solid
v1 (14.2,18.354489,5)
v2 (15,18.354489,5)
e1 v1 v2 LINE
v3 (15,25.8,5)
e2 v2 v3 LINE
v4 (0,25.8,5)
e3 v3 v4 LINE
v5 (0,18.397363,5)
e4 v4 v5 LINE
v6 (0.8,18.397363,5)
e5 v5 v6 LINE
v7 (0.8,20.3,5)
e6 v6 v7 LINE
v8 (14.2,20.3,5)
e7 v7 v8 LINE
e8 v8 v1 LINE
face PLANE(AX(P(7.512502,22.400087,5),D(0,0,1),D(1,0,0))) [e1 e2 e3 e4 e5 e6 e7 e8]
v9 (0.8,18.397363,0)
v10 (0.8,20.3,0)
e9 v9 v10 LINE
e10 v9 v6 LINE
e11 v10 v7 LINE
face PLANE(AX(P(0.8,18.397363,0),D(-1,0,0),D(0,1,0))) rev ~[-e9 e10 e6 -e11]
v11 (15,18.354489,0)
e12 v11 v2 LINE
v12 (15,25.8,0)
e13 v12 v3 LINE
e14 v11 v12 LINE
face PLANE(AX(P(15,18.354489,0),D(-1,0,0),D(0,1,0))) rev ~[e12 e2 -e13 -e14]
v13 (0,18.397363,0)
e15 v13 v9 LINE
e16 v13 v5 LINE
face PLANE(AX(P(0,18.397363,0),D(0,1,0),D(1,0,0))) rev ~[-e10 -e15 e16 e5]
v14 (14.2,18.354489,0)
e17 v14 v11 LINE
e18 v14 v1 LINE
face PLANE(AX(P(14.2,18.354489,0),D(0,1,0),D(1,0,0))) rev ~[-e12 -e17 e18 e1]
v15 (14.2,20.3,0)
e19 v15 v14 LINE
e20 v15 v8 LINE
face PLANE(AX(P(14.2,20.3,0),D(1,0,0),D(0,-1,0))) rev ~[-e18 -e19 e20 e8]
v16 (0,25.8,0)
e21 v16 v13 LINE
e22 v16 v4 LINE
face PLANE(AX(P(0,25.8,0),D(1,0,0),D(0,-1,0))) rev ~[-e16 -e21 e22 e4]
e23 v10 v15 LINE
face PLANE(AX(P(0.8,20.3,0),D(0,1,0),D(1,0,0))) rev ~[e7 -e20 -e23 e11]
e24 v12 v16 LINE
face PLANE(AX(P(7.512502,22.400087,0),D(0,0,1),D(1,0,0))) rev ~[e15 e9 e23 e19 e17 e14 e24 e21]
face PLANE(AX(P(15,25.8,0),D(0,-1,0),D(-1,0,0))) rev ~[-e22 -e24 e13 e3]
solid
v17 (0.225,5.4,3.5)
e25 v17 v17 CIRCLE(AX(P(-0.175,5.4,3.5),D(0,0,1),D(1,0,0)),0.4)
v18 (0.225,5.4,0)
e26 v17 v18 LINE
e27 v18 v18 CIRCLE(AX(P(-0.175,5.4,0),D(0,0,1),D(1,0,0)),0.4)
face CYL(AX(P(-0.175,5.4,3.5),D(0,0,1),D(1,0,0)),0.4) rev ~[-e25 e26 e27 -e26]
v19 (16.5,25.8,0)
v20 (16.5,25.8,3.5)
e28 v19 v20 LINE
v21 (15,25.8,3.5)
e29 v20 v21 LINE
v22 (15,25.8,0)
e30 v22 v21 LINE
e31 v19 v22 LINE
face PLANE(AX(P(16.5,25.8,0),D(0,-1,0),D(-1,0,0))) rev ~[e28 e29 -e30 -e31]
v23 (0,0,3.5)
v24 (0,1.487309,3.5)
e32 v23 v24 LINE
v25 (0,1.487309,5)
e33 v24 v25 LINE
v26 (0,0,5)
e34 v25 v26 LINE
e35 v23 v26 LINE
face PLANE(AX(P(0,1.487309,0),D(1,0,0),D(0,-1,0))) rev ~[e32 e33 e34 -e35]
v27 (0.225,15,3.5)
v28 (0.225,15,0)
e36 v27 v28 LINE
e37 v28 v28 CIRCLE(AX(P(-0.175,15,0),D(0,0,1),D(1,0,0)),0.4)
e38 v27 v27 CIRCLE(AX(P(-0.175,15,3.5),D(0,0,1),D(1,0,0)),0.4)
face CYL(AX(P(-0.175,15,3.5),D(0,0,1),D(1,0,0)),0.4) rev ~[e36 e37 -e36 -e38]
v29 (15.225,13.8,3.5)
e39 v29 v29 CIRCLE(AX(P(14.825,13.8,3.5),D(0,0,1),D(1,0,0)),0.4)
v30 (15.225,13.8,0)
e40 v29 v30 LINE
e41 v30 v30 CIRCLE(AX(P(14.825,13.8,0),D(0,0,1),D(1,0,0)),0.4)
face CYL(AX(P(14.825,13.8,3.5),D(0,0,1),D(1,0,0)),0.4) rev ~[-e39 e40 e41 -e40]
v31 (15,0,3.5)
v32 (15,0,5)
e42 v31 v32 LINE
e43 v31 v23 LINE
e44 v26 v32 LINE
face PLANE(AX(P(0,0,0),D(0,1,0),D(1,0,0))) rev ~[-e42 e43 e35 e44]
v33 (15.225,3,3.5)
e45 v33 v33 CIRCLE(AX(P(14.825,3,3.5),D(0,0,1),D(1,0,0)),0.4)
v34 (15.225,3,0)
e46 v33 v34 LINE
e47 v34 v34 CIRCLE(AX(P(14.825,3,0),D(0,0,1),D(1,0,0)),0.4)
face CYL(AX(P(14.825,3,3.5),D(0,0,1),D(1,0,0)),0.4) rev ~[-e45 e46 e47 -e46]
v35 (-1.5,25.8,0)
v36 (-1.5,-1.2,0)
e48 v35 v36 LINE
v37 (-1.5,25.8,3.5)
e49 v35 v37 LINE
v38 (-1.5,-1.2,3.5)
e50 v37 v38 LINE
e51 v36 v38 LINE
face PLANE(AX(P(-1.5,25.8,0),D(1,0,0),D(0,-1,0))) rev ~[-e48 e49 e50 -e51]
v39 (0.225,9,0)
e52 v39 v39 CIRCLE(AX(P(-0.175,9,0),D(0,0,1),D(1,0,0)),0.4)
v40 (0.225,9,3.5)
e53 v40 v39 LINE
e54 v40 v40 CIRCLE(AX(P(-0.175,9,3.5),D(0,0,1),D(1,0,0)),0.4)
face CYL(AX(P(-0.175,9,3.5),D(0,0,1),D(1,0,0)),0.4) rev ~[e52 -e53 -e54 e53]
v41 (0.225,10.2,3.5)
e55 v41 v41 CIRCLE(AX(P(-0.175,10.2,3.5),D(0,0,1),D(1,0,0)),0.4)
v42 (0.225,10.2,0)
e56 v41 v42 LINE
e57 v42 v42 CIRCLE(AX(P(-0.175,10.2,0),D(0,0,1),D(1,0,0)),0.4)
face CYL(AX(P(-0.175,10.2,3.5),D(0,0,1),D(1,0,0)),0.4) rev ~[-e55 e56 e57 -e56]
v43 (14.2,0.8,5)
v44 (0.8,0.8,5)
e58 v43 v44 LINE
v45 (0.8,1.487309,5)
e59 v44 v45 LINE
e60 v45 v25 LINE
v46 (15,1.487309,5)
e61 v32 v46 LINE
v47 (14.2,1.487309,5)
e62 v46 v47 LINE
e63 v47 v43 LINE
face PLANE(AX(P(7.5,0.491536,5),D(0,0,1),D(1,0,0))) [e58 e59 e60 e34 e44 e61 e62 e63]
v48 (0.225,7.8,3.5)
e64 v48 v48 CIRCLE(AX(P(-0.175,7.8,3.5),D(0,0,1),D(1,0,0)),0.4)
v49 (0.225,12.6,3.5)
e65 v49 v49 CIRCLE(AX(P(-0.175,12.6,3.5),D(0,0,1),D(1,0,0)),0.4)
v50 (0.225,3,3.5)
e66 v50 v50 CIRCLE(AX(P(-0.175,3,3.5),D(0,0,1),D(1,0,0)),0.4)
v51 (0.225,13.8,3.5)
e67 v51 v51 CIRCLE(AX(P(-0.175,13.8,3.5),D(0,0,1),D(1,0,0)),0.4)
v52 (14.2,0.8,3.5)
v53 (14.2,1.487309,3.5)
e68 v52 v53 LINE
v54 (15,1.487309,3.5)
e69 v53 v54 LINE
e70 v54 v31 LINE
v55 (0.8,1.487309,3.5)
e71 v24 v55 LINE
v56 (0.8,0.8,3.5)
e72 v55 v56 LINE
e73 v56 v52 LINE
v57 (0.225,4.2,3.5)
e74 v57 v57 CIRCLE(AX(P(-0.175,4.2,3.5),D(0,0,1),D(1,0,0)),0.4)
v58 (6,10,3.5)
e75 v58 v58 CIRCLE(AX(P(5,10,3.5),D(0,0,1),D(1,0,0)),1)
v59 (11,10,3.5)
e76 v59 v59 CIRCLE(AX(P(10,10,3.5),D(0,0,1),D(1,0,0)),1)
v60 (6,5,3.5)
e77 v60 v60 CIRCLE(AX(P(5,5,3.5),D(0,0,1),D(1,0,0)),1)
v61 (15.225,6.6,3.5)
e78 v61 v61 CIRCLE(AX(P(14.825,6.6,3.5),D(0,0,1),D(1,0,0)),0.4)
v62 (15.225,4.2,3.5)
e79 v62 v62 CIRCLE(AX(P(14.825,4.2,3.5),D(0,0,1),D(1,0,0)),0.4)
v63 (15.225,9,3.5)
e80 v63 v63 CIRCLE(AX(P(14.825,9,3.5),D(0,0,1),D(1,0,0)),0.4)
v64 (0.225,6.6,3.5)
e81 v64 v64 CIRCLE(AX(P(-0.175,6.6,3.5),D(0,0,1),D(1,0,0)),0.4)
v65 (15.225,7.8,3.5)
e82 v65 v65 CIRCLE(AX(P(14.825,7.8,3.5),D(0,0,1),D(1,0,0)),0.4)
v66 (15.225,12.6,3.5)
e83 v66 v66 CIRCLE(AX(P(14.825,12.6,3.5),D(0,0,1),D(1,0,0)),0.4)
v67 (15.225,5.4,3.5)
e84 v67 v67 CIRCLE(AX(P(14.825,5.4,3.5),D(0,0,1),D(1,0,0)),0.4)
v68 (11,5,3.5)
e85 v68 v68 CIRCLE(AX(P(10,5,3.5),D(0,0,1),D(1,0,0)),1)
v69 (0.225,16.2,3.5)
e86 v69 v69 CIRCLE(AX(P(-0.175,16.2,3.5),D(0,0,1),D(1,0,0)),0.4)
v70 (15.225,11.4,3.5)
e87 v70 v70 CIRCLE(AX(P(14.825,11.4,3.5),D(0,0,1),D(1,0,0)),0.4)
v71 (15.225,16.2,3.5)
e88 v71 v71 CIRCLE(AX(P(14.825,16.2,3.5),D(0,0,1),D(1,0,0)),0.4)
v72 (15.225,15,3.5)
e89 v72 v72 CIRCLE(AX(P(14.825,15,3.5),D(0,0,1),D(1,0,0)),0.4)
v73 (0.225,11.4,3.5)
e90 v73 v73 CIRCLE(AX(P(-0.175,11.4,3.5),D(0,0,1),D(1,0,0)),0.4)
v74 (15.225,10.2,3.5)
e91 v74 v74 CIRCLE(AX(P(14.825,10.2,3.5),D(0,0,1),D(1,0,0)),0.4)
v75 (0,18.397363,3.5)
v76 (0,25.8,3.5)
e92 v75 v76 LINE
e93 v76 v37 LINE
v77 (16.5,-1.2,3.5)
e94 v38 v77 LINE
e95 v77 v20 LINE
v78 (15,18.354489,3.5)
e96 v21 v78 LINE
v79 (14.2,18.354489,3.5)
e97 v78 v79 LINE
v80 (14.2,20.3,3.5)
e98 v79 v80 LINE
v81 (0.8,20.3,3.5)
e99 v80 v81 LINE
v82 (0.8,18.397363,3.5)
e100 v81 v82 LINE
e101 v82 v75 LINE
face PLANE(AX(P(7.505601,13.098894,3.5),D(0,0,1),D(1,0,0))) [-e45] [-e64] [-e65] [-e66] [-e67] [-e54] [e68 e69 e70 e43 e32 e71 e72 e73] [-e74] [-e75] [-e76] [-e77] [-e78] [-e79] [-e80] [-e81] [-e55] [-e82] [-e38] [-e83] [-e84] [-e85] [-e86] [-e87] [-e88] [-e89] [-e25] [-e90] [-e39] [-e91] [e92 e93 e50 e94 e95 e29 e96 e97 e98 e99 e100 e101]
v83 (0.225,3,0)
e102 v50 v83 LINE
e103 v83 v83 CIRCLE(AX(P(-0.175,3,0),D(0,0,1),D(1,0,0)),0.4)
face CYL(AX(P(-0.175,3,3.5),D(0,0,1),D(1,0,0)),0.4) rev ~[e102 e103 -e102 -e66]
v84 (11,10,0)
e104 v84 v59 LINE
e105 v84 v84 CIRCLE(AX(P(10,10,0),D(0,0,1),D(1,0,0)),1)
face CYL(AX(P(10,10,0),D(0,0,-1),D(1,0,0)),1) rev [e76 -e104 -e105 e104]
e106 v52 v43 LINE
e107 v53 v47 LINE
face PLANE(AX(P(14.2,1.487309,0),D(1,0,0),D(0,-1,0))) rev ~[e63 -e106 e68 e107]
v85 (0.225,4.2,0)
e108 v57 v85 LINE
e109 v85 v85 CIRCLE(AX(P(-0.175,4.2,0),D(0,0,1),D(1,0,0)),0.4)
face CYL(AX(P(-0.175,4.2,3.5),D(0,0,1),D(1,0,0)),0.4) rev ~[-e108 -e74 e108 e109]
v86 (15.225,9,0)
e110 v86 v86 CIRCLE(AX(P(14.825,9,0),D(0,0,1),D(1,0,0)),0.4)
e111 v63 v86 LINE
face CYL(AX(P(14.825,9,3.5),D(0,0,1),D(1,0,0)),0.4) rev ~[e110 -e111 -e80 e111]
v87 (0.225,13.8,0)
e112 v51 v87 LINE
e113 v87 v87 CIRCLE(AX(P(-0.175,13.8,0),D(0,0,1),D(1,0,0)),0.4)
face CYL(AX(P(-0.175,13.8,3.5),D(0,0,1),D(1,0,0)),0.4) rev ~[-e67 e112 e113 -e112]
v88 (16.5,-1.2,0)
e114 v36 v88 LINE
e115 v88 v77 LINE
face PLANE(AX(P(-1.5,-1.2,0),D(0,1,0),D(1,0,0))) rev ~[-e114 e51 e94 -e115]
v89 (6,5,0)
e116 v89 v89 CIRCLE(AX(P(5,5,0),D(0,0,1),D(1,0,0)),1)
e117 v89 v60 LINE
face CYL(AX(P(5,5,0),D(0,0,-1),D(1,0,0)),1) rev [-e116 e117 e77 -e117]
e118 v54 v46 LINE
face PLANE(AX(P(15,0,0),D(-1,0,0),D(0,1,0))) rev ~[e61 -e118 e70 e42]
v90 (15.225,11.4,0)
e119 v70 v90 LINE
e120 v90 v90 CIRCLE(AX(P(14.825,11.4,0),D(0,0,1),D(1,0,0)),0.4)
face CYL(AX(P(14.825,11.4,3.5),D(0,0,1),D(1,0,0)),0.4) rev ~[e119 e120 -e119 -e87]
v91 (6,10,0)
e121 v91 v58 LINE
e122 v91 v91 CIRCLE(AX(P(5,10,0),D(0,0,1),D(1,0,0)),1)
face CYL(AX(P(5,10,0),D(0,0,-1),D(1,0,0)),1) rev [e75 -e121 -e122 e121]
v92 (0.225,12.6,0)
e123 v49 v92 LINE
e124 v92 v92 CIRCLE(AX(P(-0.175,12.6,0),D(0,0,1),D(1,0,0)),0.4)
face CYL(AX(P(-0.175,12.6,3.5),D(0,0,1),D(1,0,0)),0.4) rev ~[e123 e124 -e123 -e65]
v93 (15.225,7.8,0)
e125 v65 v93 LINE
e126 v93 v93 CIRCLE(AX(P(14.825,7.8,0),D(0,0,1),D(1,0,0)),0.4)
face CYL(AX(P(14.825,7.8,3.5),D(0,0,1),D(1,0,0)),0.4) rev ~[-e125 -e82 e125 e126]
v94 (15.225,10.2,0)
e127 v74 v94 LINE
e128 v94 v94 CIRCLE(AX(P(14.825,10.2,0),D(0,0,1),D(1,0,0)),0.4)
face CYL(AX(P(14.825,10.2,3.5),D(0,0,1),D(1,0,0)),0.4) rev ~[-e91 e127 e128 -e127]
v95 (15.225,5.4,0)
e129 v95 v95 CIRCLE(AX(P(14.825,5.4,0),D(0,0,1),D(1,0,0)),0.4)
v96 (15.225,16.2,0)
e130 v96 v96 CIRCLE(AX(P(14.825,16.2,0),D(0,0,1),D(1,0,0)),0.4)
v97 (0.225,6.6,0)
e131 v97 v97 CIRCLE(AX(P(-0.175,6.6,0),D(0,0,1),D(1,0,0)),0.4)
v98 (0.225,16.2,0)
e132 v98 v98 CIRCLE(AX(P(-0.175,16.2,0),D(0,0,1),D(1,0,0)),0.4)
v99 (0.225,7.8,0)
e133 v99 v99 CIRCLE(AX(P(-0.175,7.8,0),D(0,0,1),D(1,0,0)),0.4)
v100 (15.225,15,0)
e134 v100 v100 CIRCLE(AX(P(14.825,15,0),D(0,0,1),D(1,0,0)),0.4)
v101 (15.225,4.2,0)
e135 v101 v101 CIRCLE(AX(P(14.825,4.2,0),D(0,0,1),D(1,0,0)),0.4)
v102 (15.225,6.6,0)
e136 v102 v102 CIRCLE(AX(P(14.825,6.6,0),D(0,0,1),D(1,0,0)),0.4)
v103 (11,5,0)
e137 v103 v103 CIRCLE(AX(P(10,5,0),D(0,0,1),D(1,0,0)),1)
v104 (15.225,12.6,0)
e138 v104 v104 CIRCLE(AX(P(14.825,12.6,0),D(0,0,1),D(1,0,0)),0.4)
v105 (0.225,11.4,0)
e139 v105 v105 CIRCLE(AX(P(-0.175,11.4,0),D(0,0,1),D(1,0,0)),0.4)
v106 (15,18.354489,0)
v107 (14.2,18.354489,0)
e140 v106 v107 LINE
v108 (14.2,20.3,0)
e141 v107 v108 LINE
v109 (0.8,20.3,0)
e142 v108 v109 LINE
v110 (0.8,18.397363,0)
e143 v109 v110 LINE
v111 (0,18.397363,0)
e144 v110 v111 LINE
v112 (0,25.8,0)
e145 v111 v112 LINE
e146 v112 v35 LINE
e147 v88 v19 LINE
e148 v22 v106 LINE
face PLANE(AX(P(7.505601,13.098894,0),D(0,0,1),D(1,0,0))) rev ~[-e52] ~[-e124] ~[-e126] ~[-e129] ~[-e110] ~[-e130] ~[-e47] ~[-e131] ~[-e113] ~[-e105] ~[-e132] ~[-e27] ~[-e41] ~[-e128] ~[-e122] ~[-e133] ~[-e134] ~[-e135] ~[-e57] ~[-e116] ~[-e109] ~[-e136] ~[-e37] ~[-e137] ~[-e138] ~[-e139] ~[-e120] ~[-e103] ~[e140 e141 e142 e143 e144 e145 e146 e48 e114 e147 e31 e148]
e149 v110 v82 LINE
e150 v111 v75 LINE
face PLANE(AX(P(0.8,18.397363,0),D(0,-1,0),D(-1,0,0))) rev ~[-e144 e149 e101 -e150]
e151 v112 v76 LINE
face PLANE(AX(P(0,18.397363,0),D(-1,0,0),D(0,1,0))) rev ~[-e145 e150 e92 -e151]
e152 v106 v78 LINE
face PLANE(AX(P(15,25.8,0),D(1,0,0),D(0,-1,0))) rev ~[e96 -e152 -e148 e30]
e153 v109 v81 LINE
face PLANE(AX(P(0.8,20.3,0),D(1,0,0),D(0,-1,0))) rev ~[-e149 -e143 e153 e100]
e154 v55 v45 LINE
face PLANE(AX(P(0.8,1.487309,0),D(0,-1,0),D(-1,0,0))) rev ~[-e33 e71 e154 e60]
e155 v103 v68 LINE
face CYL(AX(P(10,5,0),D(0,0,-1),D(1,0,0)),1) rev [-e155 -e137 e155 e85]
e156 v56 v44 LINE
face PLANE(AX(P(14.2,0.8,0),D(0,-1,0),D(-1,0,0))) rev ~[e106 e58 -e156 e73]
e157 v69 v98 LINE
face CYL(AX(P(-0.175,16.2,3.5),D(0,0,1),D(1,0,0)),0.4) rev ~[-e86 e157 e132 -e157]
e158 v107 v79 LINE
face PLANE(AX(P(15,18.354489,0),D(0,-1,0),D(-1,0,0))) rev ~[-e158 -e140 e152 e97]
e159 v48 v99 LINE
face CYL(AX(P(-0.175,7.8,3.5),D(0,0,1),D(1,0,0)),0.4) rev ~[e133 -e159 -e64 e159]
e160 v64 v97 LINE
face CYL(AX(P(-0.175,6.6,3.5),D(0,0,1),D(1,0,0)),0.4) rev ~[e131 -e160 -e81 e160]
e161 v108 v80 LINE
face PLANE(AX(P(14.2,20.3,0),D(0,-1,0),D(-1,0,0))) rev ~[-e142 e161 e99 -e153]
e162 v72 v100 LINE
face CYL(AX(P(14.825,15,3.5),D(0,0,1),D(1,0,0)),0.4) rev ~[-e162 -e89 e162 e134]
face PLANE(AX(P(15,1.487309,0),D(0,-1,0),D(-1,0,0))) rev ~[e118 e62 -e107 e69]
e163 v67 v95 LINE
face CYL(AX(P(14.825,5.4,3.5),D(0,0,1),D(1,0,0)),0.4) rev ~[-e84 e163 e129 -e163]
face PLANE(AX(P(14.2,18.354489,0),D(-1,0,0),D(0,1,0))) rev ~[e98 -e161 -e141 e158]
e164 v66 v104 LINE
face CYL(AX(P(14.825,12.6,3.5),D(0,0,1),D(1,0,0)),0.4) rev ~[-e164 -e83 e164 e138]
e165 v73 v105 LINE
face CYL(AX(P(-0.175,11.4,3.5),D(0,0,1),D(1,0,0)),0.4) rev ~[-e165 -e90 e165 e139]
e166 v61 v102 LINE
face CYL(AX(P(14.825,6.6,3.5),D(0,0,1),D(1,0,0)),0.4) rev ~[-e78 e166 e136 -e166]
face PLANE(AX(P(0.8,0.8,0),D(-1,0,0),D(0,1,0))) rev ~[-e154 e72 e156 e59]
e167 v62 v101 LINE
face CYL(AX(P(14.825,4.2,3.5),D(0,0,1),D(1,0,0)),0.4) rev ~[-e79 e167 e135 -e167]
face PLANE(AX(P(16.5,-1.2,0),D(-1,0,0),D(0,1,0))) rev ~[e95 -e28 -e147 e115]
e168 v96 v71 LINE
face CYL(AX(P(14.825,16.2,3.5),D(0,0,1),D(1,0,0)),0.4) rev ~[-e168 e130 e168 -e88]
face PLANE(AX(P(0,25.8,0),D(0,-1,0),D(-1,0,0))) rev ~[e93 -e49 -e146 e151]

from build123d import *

# Parameters (mm, degrees)
F1_DEPTH = 5
F0_R     = 1
F2_DEPTH = 3.5
F3_R     = 0.4
F4_DEPTH = 12.5


with BuildPart() as f1:
    # F0 (on Top) → F1 (new body)
    with BuildSketch(Plane.XY):
        Polygon((0, 1.4873089967), (0, 0), (15, 0), (15, 1.4873089967), (14.2, 1.4873089967), (14.2, 0.8), (0.8, 0.8), (0.8, 1.4873089967), align=None)
    extrude(amount=F1_DEPTH)

    # F0 (on Top) → F2 (join)
    with BuildSketch(Plane.XY):
        Polygon((0, 18.3973629028), (0, 25.8), (-1.5, 25.8), (-1.5, -1.2), (16.5, -1.2), (16.5, 25.8), (15, 25.8), (15, 18.3544885367), (14.2, 18.3544885367), (14.2, 20.3), (0.8, 20.3), (0.8, 18.3973629028), align=None)
        with Locations((5, 5)):
            Circle(F0_R, mode=Mode.SUBTRACT)
        with Locations((5, 10)):
            Circle(F0_R, mode=Mode.SUBTRACT)
        Polygon((15, 0), (0, 0), (0, 1.4873089967), (0.8, 1.4873089967), (0.8, 0.8), (14.2, 0.8), (14.2, 1.4873089967), (15, 1.4873089967), align=None, mode=Mode.SUBTRACT)
        with Locations((10, 5)):
            Circle(F0_R, mode=Mode.SUBTRACT)
        with Locations((10, 10)):
            Circle(F0_R, mode=Mode.SUBTRACT)
    extrude(amount=F2_DEPTH)

    # F3 (on face) → F4 (cut, symmetric)
    with BuildSketch(Plane.XY.offset(3.5)):
        with Locations((-0.175, 3)):
            Circle(F3_R)
        with Locations((-0.175, 4.2)):
            Circle(F3_R)
        with Locations((-0.175, 5.4)):
            Circle(F3_R)
        with Locations((-0.175, 6.6)):
            Circle(F3_R)
        with Locations((-0.175, 7.8)):
            Circle(F3_R)
        with Locations((-0.175, 9)):
            Circle(F3_R)
        with Locations((-0.175, 10.2)):
            Circle(F3_R)
        with Locations((-0.175, 11.4)):
            Circle(F3_R)
        with Locations((-0.175, 12.6)):
            Circle(F3_R)
        with Locations((-0.175, 13.8)):
            Circle(F3_R)
        with Locations((-0.175, 15)):
            Circle(F3_R)
        with Locations((-0.175, 16.2)):
            Circle(F3_R)
        with Locations((14.825, 3)):
            Circle(F3_R)
        with Locations((14.825, 4.2)):
            Circle(F3_R)
        with Locations((14.825, 5.4)):
            Circle(F3_R)
        with Locations((14.825, 6.6)):
            Circle(F3_R)
        with Locations((14.825, 7.8)):
            Circle(F3_R)
        with Locations((14.825, 9)):
            Circle(F3_R)
        with Locations((14.825, 10.2)):
            Circle(F3_R)
        with Locations((14.825, 11.4)):
            Circle(F3_R)
        with Locations((14.825, 12.6)):
            Circle(F3_R)
        with Locations((14.825, 13.8)):
            Circle(F3_R)
        with Locations((14.825, 15)):
            Circle(F3_R)
        with Locations((14.825, 16.2)):
            Circle(F3_R)
    extrude(amount=F4_DEPTH, both=True, mode=Mode.SUBTRACT)


with BuildPart() as f1b:
    # F0 (on Top) → F1, piece 2 (new body)
    with BuildSketch(Plane.XY):
        Polygon((15, 25.8), (0, 25.8), (0, 18.3973629028), (0.8, 18.3973629028), (0.8, 20.3), (14.2, 20.3), (14.2, 18.3544885367), (15, 18.3544885367), align=None)
    extrude(amount=F1_DEPTH)


solid = Compound([f1.part, f1b.part])
